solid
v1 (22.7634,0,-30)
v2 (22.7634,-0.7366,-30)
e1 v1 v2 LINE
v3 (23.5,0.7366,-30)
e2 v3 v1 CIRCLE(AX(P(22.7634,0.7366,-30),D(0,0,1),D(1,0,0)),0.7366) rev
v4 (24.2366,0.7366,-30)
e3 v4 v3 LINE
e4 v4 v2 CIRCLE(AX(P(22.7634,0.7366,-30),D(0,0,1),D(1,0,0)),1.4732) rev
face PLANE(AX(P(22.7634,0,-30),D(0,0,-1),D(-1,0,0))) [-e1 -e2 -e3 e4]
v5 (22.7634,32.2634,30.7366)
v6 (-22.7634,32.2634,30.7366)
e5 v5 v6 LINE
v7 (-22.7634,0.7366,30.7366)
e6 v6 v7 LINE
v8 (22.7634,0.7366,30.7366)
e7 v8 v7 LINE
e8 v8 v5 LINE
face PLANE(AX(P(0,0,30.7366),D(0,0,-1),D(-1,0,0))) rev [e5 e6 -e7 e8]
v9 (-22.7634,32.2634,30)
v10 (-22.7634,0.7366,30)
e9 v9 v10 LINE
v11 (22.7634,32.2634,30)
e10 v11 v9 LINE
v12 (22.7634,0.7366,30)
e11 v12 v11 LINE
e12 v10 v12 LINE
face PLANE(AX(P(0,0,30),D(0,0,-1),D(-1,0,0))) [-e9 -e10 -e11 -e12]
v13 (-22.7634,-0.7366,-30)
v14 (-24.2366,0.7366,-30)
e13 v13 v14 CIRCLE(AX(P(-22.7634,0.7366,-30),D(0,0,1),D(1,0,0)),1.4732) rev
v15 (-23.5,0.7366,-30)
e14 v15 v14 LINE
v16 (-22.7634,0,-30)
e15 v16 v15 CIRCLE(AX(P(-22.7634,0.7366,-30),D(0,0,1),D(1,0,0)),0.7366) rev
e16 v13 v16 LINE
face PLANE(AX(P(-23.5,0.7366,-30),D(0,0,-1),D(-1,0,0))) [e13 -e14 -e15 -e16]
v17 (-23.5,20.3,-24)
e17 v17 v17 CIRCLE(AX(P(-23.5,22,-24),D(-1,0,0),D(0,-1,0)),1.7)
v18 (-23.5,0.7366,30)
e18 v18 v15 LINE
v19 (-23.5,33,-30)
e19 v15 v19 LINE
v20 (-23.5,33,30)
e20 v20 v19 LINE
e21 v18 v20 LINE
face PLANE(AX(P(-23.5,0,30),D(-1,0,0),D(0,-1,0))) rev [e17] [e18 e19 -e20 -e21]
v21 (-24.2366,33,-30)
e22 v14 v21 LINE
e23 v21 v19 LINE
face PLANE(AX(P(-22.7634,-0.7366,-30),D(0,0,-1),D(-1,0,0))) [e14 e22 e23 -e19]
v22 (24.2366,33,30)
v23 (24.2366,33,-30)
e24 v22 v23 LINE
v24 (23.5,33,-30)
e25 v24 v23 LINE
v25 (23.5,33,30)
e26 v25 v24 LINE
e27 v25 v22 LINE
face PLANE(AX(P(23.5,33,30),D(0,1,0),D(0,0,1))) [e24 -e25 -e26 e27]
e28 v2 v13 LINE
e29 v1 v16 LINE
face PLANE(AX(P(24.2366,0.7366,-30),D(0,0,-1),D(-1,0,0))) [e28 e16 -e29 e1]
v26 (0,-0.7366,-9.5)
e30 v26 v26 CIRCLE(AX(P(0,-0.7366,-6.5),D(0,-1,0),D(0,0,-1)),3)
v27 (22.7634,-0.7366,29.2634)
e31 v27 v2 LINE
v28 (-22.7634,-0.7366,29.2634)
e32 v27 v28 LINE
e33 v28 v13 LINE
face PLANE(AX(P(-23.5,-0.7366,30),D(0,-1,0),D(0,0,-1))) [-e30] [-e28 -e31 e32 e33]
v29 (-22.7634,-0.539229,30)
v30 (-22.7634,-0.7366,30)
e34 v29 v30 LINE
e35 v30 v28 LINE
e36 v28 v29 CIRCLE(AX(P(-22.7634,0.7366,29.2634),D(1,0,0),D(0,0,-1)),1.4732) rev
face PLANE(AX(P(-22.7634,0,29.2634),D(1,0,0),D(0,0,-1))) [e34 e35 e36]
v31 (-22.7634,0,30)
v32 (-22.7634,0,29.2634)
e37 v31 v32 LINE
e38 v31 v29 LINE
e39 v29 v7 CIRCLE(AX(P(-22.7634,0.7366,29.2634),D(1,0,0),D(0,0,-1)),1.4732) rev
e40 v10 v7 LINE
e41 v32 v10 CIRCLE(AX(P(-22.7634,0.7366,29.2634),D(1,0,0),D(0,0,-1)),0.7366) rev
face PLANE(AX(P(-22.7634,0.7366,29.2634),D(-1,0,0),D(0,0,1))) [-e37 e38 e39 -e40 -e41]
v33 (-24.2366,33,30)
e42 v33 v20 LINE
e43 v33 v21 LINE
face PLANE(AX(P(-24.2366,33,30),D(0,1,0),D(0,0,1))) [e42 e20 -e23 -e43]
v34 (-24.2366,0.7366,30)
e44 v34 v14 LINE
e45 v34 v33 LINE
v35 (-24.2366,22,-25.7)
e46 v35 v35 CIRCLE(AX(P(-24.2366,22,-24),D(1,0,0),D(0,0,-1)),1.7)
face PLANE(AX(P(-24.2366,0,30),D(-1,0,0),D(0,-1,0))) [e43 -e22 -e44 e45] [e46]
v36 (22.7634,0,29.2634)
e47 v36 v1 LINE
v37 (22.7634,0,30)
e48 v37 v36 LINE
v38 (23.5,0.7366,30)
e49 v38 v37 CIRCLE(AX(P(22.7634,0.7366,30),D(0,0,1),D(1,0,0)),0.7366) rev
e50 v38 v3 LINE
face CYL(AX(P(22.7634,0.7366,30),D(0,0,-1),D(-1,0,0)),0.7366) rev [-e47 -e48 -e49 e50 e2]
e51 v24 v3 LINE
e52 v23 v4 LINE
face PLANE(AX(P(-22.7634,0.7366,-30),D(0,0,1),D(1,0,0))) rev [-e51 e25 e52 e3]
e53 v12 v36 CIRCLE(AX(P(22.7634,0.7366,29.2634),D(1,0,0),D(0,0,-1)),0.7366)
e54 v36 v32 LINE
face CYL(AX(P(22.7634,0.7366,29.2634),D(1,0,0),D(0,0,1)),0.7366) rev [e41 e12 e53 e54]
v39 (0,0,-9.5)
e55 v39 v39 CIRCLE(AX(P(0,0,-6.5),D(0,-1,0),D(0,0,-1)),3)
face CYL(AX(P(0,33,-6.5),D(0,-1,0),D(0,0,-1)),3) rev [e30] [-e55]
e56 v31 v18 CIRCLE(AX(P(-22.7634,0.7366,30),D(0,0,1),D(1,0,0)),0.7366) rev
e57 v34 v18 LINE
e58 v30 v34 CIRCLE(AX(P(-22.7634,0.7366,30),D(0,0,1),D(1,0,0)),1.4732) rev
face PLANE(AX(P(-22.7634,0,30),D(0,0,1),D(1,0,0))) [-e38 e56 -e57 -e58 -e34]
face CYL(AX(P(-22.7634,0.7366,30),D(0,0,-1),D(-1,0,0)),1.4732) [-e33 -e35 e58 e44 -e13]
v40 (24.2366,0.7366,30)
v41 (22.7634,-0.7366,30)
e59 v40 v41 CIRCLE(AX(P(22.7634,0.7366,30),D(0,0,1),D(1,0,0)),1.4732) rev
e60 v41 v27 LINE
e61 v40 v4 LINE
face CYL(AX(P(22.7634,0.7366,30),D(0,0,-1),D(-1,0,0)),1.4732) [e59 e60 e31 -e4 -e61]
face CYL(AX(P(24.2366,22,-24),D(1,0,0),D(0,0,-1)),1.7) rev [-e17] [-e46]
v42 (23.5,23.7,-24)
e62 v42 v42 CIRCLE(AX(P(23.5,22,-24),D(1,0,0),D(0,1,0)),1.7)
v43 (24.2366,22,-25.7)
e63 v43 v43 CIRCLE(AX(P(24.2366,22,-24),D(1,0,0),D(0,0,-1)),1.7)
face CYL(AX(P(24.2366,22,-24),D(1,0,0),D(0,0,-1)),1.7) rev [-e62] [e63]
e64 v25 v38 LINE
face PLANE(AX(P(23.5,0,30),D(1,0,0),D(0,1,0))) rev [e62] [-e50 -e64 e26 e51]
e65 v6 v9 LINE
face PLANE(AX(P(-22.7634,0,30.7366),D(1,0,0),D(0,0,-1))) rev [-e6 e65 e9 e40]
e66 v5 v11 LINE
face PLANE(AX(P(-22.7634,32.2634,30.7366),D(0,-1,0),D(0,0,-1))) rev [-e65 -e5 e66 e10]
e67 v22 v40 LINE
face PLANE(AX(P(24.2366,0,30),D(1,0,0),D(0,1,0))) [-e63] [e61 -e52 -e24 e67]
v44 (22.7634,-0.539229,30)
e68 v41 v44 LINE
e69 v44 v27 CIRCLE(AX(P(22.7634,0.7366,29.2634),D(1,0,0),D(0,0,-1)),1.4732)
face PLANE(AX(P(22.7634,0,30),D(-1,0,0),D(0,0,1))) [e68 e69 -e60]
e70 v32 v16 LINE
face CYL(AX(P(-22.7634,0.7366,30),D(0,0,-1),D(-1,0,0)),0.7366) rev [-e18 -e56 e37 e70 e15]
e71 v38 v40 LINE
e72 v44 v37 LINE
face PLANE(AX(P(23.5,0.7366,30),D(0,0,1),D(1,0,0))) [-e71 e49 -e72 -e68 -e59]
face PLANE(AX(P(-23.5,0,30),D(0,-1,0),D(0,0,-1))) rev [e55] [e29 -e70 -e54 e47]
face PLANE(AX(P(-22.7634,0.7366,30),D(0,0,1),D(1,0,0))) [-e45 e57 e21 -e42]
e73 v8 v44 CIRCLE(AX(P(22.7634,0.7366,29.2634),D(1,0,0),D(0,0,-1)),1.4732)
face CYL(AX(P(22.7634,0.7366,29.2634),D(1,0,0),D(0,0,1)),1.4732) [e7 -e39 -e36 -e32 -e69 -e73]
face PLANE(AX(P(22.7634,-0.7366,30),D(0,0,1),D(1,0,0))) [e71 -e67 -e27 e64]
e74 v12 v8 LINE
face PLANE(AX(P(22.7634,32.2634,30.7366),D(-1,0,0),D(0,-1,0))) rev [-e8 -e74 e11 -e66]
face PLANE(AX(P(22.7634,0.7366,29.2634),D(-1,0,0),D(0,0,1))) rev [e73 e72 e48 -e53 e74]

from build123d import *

# Parameters (mm, degrees)
BASE_FLANGE1_DEPTH           = 30
EDGE_FLANGE1_STRIP_W         = 4.4196
EDGE_FLANGE1_STRIP_H         = 0.7366
EDGE_FLANGE1_STRIP_CUT_DEPTH = 45.5268
EDGE_FLANGE1_DEPTH           = 45.5268
M3_CLEARANCE_HOLE1_D         = 3.4
SKETCH13_R                   = 3
CUT_EXTRUDE2_DEPTH           = 52.675037868


# Sheet-metal steps are written as plain solids
with BuildPart() as part:
    # Sketch1 → Base-Flange1 (new, symmetric)
    with BuildSketch(Plane.XY):
        with BuildLine():
            Line((-23.5, 33), (-23.5, 0.7366))
            ThreePointArc((-23.5, 0.7366), (-23.284254855, 0.215745145), (-22.7634, 0))
            Line((-22.7634, 0), (22.7634, 0))
            ThreePointArc((22.7634, 0), (23.284254855, 0.215745145), (23.5, 0.7366))
            Line((23.5, 0.7366), (23.5, 33))
            Line((23.5, 33), (24.2366, 33))
            Line((24.2366, 33), (24.2366, 0.7366))
            ThreePointArc((24.2366, 0.7366), (23.80510971, -0.30510971), (22.7634, -0.7366))
            Line((22.7634, -0.7366), (-22.7634, -0.7366))
            ThreePointArc((-22.7634, -0.7366), (-23.80510971, -0.30510971), (-24.2366, 0.7366))
            Line((-24.2366, 0.7366), (-24.2366, 33))
            Line((-24.2366, 33), (-23.5, 33))
        make_face()
    extrude(amount=BASE_FLANGE1_DEPTH, both=True)

    # Edge-Flange1 strip (across the edge) → Edge-Flange1 strip cut (cut)
    with BuildSketch(Plane(origin=(-22.7634, 0, 30), x_dir=(0, 0, -1), z_dir=(1, 0, 0))):
        with Locations((-1.4732, -0.3683)):
            Rectangle(EDGE_FLANGE1_STRIP_W, EDGE_FLANGE1_STRIP_H)
    extrude(amount=EDGE_FLANGE1_STRIP_CUT_DEPTH, mode=Mode.SUBTRACT)

    # Edge-Flange1 section (across the edge) → Edge-Flange1 (add)
    with BuildSketch(Plane(origin=(-22.7634, 0, 30), x_dir=(0, 0, -1), z_dir=(1, 0, 0))):
        with BuildLine():
            Line((-0.7366, 0.7366), (-0.7366, 32.2634))
            Line((-0.7366, 32.2634), (0, 32.2634))
            Line((0, 32.2634), (0, 0.7366))
            ThreePointArc((0, 0.7366), (0.215745145, 0.215745145), (0.7366, 0))
            Line((0.7366, 0), (0.7366, -0.7366))
            ThreePointArc((0.7366, -0.7366), (-0.30510971, -0.30510971), (-0.7366, 0.7366))
        make_face()
    extrude(amount=EDGE_FLANGE1_DEPTH)

    # M3 Clearance Hole1 (through all)
    with Locations(Plane(origin=(24.2366, 0, 0), x_dir=(0, 0, -1), z_dir=(1, 0, 0))):
        with Locations((24, 22)):
            Hole(M3_CLEARANCE_HOLE1_D / 2)

    # Sketch13 → Cut-Extrude2 (cut, through all)
    with BuildSketch(Plane.XZ.offset(0.7366)):
        with Locations(Location((0, -6.5, 0), (0, 0, 270))):
            Circle(SKETCH13_R)
    extrude(amount=-CUT_EXTRUDE2_DEPTH, mode=Mode.SUBTRACT)


solid = part.part
